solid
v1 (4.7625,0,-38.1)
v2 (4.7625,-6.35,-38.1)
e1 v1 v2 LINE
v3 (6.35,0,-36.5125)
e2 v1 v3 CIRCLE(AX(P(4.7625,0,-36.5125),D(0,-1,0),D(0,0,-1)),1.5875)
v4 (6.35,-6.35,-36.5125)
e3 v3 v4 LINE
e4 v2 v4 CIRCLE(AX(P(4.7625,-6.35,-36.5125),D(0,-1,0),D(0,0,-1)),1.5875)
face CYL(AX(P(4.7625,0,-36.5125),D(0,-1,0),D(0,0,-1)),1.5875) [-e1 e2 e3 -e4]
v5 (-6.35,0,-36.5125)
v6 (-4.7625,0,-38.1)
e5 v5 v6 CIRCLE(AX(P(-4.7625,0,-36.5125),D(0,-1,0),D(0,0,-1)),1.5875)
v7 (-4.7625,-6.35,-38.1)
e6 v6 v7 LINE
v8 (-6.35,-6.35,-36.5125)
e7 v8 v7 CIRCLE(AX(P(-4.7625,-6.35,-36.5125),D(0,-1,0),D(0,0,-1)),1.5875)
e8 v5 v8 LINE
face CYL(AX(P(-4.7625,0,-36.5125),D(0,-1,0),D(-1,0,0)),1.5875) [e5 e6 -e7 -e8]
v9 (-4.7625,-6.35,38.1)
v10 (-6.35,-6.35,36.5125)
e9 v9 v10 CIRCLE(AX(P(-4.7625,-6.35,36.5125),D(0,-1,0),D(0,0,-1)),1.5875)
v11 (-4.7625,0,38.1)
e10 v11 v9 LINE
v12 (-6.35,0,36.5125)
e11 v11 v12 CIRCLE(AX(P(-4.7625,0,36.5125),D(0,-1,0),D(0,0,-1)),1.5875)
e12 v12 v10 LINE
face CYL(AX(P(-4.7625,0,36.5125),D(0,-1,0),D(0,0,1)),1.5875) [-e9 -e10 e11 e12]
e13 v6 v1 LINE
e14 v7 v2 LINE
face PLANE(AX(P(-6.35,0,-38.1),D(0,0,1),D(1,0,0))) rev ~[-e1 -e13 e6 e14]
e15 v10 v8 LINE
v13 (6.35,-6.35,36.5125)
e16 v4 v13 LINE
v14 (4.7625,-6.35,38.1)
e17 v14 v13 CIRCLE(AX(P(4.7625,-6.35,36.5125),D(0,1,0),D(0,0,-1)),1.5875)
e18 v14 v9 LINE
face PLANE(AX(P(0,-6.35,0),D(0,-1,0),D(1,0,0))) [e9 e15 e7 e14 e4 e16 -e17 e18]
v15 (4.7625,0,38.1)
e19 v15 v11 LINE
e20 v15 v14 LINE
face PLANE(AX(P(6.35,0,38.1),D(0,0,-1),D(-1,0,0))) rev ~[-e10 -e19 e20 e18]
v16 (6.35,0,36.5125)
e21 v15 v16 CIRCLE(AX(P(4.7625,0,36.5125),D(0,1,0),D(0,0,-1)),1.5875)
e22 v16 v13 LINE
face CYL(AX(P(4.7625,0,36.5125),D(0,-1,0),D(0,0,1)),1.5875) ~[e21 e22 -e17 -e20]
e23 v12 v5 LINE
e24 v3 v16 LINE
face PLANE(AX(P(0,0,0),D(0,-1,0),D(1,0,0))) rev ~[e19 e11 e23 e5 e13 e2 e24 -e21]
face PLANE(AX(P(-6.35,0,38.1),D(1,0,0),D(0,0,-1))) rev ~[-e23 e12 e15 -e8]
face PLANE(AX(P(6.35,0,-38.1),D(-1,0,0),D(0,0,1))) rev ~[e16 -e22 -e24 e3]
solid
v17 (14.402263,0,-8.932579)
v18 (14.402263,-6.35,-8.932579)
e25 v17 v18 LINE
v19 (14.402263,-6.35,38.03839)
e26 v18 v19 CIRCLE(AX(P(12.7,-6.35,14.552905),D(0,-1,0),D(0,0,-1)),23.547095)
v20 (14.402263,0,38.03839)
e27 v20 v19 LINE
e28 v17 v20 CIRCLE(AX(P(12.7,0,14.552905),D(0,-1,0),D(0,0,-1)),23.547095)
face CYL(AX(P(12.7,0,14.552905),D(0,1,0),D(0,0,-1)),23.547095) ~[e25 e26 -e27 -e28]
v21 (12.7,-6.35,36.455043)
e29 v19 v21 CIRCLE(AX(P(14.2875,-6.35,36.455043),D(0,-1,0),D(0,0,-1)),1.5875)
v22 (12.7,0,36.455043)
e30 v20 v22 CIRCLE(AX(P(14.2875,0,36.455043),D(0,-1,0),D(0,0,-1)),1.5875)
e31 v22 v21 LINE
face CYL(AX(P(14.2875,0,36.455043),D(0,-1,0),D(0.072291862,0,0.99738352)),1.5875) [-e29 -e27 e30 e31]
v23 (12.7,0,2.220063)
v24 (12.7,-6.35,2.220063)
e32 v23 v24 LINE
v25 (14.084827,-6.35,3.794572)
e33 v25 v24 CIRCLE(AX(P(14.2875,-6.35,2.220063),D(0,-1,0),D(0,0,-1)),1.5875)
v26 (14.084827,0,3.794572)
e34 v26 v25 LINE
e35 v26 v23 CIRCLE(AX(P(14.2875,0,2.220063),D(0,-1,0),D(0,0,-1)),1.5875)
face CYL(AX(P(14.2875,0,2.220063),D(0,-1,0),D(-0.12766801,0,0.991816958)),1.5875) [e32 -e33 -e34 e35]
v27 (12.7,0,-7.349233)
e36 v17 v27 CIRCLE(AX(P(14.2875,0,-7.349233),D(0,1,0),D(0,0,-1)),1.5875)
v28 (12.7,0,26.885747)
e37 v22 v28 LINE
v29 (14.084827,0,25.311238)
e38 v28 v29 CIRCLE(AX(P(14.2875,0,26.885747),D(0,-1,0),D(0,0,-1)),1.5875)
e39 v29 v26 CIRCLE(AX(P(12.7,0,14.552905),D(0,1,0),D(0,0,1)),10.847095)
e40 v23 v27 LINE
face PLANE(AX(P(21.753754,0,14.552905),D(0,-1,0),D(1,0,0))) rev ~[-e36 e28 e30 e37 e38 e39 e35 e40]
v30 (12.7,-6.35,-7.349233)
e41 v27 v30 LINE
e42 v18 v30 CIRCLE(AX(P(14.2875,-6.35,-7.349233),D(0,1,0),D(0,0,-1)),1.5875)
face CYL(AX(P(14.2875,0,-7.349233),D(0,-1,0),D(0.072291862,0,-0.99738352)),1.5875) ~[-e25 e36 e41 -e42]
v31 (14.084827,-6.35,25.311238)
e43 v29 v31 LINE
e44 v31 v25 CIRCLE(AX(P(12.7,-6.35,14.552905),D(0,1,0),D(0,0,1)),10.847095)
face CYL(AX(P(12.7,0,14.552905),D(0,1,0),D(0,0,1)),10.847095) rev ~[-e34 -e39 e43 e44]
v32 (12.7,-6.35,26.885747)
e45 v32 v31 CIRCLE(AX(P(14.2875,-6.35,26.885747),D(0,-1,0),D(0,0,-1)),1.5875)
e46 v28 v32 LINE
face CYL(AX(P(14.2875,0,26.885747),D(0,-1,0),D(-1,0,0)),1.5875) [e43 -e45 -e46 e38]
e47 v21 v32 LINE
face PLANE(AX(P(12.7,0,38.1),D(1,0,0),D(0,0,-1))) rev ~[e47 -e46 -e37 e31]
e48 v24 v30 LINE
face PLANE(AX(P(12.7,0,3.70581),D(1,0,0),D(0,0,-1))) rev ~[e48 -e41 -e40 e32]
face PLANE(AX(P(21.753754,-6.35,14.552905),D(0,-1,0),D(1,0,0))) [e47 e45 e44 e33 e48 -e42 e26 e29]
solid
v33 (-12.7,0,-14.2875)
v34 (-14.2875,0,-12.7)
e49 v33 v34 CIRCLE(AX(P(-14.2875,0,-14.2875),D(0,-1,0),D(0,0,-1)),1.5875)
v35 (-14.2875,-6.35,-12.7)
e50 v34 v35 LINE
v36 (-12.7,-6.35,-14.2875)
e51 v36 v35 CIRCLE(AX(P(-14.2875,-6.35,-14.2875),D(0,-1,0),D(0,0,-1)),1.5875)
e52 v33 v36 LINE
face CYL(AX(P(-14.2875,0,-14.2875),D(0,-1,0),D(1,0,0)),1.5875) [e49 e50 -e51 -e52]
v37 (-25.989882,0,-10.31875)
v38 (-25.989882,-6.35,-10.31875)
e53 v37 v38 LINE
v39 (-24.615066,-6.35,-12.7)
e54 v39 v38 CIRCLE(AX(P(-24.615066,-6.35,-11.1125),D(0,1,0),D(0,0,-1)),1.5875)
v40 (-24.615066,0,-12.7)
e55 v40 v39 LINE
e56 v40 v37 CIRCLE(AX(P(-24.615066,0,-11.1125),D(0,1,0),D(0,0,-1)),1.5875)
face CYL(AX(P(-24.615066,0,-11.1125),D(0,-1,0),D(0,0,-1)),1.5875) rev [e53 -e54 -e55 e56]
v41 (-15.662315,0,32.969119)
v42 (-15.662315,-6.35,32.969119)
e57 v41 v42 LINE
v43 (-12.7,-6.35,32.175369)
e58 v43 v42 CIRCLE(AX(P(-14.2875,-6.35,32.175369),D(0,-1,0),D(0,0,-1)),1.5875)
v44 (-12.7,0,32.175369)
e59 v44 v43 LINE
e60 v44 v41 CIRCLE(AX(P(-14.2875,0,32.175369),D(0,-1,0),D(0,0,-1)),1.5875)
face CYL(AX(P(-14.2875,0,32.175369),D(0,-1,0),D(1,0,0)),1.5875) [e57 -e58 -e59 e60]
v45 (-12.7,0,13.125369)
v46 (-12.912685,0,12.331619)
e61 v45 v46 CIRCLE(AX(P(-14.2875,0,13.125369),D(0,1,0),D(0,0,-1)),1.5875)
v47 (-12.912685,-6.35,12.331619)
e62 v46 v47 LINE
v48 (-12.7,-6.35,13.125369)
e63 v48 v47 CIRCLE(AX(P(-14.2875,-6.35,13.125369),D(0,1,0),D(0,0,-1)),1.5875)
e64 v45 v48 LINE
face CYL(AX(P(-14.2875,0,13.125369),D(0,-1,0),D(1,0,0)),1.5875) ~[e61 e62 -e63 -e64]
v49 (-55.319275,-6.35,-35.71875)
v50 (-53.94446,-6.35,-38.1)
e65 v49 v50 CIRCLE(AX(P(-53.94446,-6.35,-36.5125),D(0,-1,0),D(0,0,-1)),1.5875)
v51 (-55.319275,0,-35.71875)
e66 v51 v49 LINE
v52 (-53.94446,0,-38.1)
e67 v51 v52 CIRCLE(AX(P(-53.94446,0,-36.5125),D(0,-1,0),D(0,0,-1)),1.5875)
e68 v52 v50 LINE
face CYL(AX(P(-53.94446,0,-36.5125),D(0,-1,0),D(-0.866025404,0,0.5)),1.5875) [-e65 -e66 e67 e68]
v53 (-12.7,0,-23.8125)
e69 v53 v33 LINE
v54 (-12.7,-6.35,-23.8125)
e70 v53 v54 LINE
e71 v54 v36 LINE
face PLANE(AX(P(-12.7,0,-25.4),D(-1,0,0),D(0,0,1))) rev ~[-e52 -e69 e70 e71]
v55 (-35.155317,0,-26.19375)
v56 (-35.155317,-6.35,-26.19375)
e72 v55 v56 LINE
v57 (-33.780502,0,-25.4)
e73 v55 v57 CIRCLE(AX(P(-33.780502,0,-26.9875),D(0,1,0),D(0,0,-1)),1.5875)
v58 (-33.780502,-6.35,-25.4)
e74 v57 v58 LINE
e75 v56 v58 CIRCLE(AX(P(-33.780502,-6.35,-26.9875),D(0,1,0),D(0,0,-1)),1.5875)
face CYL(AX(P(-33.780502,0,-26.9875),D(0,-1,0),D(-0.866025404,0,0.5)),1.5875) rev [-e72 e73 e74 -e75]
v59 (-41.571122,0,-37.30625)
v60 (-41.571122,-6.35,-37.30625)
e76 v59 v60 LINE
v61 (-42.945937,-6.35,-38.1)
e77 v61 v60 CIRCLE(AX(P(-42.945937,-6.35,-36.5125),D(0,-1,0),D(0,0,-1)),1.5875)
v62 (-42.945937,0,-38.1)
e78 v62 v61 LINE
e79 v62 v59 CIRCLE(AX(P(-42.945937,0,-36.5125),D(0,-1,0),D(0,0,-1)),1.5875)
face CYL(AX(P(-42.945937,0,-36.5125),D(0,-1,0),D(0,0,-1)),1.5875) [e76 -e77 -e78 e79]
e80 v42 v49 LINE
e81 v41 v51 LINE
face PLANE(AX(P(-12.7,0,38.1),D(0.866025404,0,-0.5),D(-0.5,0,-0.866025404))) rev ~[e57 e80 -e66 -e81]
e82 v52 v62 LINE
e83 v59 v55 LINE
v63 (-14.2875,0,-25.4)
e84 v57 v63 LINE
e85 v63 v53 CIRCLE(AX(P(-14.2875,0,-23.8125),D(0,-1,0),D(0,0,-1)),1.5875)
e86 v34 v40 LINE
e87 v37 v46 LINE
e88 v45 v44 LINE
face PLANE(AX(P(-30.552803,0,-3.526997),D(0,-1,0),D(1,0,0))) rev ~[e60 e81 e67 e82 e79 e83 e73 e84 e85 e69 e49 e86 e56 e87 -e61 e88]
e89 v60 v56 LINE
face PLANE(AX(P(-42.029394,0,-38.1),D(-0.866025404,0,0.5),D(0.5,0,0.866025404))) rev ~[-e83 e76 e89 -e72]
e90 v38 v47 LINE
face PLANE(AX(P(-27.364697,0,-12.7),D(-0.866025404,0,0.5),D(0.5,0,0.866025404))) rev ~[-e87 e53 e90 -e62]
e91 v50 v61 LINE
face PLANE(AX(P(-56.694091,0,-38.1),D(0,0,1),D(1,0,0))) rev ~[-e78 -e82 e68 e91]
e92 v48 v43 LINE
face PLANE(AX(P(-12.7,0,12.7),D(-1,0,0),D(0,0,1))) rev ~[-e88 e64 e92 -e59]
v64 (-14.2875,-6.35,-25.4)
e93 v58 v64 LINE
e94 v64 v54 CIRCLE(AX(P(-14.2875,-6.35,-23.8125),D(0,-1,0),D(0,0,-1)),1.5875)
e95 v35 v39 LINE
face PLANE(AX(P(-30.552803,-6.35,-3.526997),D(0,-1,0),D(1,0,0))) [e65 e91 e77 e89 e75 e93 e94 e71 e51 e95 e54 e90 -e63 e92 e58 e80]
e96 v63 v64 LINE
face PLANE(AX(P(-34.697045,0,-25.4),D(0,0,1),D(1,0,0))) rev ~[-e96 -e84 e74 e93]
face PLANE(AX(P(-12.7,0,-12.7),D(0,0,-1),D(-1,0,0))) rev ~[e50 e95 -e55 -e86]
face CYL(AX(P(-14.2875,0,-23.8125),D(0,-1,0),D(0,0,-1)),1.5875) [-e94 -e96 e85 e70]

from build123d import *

# Parameters (mm, degrees)
F2_DEPTH = 6.35
F3_R     = 1.5875
F3_2_R   = 1.5875
F3_3_R   = 1.5875


# Not quite as in the source:
# - a variable given as a bare number and used for a length is read in inches; the dataset says mm whatever the document's units were


with BuildPart() as f2:
    # F1 (on Front) → F2 (new body)
    with BuildSketch(Plane.XZ):
        Polygon((-12.7, 12.7), (-12.7, 38.1), (-56.6940905122, -38.1), (-42.0293936748, -38.1), (-34.6970452561, -25.4), (-27.3646968374, -12.7), align=None)
        Polygon((-12.7, -25.4), (-12.7, -12.7), (-27.3646968374, -12.7), (-34.6970452561, -25.4), align=None)
    extrude(amount=F2_DEPTH)

    # F3
    f3_edges = [f2.edges().sort_by_distance(p)[0] for p in [
        (-12.7, -3.175, 38.1),
        (-12.7, -3.175, 12.7),
        (-12.7, -3.175, -25.4),
        (-34.697045, -3.175, -25.4),
        (-42.029394, -3.175, -38.1),
        (-56.694091, -3.175, -38.1),
        (-27.364697, -3.175, -12.7),
        (-12.7, -3.175, -12.7),
    ]]
    fillet(f3_edges, radius=F3_R)


with BuildPart() as f2b:
    # F1 (on Front) → F2, piece 2 (new body)
    with BuildSketch(Plane.XZ):
        Polygon((6.35, 38.1), (-6.35, 38.1), (-6.35, 12.7), (-6.35, -12.7), (-6.35, -25.4), (-6.35, -38.1), (6.35, -38.1), (6.35, -8.9941899428), (6.35, 3.7058100572), (6.35, 25.4), align=None)
    extrude(amount=F2_DEPTH)

    # F3#2
    f3_2_edges = [f2b.edges().sort_by_distance(p)[0] for p in [
        (-6.35, -3.175, 38.1),
        (6.35, -3.175, 38.1),
        (-6.35, -3.175, -38.1),
        (6.35, -3.175, -38.1),
    ]]
    fillet(f3_2_edges, radius=F3_2_R)


with BuildPart() as f2c:
    # F1 (on Front) → F2, piece 3 (new body)
    with BuildSketch(Plane.XZ):
        with BuildLine():
            ThreePointArc((12.7, -8.9941899428), (36.2470949714, 14.5529050286), (12.7, 38.1))
            Line((12.7, 38.1), (12.7, 25.4))
            ThreePointArc((12.7, 25.4), (23.5470949714, 14.5529050286), (12.7, 3.7058100572))
            Line((12.7, 3.7058100573), (12.7, -8.9941899428))
        make_face()
    extrude(amount=F2_DEPTH)

    # F3#3
    f3_3_edges = [f2c.edges().sort_by_distance(p)[0] for p in [
        (12.7, -3.175, -8.99419),
        (12.7, -3.175, 3.70581),
        (12.7, -3.175, 25.4),
        (12.7, -3.175, 38.1),
    ]]
    fillet(f3_3_edges, radius=F3_3_R)


solid = Compound([f2.part, f2b.part, f2c.part])
